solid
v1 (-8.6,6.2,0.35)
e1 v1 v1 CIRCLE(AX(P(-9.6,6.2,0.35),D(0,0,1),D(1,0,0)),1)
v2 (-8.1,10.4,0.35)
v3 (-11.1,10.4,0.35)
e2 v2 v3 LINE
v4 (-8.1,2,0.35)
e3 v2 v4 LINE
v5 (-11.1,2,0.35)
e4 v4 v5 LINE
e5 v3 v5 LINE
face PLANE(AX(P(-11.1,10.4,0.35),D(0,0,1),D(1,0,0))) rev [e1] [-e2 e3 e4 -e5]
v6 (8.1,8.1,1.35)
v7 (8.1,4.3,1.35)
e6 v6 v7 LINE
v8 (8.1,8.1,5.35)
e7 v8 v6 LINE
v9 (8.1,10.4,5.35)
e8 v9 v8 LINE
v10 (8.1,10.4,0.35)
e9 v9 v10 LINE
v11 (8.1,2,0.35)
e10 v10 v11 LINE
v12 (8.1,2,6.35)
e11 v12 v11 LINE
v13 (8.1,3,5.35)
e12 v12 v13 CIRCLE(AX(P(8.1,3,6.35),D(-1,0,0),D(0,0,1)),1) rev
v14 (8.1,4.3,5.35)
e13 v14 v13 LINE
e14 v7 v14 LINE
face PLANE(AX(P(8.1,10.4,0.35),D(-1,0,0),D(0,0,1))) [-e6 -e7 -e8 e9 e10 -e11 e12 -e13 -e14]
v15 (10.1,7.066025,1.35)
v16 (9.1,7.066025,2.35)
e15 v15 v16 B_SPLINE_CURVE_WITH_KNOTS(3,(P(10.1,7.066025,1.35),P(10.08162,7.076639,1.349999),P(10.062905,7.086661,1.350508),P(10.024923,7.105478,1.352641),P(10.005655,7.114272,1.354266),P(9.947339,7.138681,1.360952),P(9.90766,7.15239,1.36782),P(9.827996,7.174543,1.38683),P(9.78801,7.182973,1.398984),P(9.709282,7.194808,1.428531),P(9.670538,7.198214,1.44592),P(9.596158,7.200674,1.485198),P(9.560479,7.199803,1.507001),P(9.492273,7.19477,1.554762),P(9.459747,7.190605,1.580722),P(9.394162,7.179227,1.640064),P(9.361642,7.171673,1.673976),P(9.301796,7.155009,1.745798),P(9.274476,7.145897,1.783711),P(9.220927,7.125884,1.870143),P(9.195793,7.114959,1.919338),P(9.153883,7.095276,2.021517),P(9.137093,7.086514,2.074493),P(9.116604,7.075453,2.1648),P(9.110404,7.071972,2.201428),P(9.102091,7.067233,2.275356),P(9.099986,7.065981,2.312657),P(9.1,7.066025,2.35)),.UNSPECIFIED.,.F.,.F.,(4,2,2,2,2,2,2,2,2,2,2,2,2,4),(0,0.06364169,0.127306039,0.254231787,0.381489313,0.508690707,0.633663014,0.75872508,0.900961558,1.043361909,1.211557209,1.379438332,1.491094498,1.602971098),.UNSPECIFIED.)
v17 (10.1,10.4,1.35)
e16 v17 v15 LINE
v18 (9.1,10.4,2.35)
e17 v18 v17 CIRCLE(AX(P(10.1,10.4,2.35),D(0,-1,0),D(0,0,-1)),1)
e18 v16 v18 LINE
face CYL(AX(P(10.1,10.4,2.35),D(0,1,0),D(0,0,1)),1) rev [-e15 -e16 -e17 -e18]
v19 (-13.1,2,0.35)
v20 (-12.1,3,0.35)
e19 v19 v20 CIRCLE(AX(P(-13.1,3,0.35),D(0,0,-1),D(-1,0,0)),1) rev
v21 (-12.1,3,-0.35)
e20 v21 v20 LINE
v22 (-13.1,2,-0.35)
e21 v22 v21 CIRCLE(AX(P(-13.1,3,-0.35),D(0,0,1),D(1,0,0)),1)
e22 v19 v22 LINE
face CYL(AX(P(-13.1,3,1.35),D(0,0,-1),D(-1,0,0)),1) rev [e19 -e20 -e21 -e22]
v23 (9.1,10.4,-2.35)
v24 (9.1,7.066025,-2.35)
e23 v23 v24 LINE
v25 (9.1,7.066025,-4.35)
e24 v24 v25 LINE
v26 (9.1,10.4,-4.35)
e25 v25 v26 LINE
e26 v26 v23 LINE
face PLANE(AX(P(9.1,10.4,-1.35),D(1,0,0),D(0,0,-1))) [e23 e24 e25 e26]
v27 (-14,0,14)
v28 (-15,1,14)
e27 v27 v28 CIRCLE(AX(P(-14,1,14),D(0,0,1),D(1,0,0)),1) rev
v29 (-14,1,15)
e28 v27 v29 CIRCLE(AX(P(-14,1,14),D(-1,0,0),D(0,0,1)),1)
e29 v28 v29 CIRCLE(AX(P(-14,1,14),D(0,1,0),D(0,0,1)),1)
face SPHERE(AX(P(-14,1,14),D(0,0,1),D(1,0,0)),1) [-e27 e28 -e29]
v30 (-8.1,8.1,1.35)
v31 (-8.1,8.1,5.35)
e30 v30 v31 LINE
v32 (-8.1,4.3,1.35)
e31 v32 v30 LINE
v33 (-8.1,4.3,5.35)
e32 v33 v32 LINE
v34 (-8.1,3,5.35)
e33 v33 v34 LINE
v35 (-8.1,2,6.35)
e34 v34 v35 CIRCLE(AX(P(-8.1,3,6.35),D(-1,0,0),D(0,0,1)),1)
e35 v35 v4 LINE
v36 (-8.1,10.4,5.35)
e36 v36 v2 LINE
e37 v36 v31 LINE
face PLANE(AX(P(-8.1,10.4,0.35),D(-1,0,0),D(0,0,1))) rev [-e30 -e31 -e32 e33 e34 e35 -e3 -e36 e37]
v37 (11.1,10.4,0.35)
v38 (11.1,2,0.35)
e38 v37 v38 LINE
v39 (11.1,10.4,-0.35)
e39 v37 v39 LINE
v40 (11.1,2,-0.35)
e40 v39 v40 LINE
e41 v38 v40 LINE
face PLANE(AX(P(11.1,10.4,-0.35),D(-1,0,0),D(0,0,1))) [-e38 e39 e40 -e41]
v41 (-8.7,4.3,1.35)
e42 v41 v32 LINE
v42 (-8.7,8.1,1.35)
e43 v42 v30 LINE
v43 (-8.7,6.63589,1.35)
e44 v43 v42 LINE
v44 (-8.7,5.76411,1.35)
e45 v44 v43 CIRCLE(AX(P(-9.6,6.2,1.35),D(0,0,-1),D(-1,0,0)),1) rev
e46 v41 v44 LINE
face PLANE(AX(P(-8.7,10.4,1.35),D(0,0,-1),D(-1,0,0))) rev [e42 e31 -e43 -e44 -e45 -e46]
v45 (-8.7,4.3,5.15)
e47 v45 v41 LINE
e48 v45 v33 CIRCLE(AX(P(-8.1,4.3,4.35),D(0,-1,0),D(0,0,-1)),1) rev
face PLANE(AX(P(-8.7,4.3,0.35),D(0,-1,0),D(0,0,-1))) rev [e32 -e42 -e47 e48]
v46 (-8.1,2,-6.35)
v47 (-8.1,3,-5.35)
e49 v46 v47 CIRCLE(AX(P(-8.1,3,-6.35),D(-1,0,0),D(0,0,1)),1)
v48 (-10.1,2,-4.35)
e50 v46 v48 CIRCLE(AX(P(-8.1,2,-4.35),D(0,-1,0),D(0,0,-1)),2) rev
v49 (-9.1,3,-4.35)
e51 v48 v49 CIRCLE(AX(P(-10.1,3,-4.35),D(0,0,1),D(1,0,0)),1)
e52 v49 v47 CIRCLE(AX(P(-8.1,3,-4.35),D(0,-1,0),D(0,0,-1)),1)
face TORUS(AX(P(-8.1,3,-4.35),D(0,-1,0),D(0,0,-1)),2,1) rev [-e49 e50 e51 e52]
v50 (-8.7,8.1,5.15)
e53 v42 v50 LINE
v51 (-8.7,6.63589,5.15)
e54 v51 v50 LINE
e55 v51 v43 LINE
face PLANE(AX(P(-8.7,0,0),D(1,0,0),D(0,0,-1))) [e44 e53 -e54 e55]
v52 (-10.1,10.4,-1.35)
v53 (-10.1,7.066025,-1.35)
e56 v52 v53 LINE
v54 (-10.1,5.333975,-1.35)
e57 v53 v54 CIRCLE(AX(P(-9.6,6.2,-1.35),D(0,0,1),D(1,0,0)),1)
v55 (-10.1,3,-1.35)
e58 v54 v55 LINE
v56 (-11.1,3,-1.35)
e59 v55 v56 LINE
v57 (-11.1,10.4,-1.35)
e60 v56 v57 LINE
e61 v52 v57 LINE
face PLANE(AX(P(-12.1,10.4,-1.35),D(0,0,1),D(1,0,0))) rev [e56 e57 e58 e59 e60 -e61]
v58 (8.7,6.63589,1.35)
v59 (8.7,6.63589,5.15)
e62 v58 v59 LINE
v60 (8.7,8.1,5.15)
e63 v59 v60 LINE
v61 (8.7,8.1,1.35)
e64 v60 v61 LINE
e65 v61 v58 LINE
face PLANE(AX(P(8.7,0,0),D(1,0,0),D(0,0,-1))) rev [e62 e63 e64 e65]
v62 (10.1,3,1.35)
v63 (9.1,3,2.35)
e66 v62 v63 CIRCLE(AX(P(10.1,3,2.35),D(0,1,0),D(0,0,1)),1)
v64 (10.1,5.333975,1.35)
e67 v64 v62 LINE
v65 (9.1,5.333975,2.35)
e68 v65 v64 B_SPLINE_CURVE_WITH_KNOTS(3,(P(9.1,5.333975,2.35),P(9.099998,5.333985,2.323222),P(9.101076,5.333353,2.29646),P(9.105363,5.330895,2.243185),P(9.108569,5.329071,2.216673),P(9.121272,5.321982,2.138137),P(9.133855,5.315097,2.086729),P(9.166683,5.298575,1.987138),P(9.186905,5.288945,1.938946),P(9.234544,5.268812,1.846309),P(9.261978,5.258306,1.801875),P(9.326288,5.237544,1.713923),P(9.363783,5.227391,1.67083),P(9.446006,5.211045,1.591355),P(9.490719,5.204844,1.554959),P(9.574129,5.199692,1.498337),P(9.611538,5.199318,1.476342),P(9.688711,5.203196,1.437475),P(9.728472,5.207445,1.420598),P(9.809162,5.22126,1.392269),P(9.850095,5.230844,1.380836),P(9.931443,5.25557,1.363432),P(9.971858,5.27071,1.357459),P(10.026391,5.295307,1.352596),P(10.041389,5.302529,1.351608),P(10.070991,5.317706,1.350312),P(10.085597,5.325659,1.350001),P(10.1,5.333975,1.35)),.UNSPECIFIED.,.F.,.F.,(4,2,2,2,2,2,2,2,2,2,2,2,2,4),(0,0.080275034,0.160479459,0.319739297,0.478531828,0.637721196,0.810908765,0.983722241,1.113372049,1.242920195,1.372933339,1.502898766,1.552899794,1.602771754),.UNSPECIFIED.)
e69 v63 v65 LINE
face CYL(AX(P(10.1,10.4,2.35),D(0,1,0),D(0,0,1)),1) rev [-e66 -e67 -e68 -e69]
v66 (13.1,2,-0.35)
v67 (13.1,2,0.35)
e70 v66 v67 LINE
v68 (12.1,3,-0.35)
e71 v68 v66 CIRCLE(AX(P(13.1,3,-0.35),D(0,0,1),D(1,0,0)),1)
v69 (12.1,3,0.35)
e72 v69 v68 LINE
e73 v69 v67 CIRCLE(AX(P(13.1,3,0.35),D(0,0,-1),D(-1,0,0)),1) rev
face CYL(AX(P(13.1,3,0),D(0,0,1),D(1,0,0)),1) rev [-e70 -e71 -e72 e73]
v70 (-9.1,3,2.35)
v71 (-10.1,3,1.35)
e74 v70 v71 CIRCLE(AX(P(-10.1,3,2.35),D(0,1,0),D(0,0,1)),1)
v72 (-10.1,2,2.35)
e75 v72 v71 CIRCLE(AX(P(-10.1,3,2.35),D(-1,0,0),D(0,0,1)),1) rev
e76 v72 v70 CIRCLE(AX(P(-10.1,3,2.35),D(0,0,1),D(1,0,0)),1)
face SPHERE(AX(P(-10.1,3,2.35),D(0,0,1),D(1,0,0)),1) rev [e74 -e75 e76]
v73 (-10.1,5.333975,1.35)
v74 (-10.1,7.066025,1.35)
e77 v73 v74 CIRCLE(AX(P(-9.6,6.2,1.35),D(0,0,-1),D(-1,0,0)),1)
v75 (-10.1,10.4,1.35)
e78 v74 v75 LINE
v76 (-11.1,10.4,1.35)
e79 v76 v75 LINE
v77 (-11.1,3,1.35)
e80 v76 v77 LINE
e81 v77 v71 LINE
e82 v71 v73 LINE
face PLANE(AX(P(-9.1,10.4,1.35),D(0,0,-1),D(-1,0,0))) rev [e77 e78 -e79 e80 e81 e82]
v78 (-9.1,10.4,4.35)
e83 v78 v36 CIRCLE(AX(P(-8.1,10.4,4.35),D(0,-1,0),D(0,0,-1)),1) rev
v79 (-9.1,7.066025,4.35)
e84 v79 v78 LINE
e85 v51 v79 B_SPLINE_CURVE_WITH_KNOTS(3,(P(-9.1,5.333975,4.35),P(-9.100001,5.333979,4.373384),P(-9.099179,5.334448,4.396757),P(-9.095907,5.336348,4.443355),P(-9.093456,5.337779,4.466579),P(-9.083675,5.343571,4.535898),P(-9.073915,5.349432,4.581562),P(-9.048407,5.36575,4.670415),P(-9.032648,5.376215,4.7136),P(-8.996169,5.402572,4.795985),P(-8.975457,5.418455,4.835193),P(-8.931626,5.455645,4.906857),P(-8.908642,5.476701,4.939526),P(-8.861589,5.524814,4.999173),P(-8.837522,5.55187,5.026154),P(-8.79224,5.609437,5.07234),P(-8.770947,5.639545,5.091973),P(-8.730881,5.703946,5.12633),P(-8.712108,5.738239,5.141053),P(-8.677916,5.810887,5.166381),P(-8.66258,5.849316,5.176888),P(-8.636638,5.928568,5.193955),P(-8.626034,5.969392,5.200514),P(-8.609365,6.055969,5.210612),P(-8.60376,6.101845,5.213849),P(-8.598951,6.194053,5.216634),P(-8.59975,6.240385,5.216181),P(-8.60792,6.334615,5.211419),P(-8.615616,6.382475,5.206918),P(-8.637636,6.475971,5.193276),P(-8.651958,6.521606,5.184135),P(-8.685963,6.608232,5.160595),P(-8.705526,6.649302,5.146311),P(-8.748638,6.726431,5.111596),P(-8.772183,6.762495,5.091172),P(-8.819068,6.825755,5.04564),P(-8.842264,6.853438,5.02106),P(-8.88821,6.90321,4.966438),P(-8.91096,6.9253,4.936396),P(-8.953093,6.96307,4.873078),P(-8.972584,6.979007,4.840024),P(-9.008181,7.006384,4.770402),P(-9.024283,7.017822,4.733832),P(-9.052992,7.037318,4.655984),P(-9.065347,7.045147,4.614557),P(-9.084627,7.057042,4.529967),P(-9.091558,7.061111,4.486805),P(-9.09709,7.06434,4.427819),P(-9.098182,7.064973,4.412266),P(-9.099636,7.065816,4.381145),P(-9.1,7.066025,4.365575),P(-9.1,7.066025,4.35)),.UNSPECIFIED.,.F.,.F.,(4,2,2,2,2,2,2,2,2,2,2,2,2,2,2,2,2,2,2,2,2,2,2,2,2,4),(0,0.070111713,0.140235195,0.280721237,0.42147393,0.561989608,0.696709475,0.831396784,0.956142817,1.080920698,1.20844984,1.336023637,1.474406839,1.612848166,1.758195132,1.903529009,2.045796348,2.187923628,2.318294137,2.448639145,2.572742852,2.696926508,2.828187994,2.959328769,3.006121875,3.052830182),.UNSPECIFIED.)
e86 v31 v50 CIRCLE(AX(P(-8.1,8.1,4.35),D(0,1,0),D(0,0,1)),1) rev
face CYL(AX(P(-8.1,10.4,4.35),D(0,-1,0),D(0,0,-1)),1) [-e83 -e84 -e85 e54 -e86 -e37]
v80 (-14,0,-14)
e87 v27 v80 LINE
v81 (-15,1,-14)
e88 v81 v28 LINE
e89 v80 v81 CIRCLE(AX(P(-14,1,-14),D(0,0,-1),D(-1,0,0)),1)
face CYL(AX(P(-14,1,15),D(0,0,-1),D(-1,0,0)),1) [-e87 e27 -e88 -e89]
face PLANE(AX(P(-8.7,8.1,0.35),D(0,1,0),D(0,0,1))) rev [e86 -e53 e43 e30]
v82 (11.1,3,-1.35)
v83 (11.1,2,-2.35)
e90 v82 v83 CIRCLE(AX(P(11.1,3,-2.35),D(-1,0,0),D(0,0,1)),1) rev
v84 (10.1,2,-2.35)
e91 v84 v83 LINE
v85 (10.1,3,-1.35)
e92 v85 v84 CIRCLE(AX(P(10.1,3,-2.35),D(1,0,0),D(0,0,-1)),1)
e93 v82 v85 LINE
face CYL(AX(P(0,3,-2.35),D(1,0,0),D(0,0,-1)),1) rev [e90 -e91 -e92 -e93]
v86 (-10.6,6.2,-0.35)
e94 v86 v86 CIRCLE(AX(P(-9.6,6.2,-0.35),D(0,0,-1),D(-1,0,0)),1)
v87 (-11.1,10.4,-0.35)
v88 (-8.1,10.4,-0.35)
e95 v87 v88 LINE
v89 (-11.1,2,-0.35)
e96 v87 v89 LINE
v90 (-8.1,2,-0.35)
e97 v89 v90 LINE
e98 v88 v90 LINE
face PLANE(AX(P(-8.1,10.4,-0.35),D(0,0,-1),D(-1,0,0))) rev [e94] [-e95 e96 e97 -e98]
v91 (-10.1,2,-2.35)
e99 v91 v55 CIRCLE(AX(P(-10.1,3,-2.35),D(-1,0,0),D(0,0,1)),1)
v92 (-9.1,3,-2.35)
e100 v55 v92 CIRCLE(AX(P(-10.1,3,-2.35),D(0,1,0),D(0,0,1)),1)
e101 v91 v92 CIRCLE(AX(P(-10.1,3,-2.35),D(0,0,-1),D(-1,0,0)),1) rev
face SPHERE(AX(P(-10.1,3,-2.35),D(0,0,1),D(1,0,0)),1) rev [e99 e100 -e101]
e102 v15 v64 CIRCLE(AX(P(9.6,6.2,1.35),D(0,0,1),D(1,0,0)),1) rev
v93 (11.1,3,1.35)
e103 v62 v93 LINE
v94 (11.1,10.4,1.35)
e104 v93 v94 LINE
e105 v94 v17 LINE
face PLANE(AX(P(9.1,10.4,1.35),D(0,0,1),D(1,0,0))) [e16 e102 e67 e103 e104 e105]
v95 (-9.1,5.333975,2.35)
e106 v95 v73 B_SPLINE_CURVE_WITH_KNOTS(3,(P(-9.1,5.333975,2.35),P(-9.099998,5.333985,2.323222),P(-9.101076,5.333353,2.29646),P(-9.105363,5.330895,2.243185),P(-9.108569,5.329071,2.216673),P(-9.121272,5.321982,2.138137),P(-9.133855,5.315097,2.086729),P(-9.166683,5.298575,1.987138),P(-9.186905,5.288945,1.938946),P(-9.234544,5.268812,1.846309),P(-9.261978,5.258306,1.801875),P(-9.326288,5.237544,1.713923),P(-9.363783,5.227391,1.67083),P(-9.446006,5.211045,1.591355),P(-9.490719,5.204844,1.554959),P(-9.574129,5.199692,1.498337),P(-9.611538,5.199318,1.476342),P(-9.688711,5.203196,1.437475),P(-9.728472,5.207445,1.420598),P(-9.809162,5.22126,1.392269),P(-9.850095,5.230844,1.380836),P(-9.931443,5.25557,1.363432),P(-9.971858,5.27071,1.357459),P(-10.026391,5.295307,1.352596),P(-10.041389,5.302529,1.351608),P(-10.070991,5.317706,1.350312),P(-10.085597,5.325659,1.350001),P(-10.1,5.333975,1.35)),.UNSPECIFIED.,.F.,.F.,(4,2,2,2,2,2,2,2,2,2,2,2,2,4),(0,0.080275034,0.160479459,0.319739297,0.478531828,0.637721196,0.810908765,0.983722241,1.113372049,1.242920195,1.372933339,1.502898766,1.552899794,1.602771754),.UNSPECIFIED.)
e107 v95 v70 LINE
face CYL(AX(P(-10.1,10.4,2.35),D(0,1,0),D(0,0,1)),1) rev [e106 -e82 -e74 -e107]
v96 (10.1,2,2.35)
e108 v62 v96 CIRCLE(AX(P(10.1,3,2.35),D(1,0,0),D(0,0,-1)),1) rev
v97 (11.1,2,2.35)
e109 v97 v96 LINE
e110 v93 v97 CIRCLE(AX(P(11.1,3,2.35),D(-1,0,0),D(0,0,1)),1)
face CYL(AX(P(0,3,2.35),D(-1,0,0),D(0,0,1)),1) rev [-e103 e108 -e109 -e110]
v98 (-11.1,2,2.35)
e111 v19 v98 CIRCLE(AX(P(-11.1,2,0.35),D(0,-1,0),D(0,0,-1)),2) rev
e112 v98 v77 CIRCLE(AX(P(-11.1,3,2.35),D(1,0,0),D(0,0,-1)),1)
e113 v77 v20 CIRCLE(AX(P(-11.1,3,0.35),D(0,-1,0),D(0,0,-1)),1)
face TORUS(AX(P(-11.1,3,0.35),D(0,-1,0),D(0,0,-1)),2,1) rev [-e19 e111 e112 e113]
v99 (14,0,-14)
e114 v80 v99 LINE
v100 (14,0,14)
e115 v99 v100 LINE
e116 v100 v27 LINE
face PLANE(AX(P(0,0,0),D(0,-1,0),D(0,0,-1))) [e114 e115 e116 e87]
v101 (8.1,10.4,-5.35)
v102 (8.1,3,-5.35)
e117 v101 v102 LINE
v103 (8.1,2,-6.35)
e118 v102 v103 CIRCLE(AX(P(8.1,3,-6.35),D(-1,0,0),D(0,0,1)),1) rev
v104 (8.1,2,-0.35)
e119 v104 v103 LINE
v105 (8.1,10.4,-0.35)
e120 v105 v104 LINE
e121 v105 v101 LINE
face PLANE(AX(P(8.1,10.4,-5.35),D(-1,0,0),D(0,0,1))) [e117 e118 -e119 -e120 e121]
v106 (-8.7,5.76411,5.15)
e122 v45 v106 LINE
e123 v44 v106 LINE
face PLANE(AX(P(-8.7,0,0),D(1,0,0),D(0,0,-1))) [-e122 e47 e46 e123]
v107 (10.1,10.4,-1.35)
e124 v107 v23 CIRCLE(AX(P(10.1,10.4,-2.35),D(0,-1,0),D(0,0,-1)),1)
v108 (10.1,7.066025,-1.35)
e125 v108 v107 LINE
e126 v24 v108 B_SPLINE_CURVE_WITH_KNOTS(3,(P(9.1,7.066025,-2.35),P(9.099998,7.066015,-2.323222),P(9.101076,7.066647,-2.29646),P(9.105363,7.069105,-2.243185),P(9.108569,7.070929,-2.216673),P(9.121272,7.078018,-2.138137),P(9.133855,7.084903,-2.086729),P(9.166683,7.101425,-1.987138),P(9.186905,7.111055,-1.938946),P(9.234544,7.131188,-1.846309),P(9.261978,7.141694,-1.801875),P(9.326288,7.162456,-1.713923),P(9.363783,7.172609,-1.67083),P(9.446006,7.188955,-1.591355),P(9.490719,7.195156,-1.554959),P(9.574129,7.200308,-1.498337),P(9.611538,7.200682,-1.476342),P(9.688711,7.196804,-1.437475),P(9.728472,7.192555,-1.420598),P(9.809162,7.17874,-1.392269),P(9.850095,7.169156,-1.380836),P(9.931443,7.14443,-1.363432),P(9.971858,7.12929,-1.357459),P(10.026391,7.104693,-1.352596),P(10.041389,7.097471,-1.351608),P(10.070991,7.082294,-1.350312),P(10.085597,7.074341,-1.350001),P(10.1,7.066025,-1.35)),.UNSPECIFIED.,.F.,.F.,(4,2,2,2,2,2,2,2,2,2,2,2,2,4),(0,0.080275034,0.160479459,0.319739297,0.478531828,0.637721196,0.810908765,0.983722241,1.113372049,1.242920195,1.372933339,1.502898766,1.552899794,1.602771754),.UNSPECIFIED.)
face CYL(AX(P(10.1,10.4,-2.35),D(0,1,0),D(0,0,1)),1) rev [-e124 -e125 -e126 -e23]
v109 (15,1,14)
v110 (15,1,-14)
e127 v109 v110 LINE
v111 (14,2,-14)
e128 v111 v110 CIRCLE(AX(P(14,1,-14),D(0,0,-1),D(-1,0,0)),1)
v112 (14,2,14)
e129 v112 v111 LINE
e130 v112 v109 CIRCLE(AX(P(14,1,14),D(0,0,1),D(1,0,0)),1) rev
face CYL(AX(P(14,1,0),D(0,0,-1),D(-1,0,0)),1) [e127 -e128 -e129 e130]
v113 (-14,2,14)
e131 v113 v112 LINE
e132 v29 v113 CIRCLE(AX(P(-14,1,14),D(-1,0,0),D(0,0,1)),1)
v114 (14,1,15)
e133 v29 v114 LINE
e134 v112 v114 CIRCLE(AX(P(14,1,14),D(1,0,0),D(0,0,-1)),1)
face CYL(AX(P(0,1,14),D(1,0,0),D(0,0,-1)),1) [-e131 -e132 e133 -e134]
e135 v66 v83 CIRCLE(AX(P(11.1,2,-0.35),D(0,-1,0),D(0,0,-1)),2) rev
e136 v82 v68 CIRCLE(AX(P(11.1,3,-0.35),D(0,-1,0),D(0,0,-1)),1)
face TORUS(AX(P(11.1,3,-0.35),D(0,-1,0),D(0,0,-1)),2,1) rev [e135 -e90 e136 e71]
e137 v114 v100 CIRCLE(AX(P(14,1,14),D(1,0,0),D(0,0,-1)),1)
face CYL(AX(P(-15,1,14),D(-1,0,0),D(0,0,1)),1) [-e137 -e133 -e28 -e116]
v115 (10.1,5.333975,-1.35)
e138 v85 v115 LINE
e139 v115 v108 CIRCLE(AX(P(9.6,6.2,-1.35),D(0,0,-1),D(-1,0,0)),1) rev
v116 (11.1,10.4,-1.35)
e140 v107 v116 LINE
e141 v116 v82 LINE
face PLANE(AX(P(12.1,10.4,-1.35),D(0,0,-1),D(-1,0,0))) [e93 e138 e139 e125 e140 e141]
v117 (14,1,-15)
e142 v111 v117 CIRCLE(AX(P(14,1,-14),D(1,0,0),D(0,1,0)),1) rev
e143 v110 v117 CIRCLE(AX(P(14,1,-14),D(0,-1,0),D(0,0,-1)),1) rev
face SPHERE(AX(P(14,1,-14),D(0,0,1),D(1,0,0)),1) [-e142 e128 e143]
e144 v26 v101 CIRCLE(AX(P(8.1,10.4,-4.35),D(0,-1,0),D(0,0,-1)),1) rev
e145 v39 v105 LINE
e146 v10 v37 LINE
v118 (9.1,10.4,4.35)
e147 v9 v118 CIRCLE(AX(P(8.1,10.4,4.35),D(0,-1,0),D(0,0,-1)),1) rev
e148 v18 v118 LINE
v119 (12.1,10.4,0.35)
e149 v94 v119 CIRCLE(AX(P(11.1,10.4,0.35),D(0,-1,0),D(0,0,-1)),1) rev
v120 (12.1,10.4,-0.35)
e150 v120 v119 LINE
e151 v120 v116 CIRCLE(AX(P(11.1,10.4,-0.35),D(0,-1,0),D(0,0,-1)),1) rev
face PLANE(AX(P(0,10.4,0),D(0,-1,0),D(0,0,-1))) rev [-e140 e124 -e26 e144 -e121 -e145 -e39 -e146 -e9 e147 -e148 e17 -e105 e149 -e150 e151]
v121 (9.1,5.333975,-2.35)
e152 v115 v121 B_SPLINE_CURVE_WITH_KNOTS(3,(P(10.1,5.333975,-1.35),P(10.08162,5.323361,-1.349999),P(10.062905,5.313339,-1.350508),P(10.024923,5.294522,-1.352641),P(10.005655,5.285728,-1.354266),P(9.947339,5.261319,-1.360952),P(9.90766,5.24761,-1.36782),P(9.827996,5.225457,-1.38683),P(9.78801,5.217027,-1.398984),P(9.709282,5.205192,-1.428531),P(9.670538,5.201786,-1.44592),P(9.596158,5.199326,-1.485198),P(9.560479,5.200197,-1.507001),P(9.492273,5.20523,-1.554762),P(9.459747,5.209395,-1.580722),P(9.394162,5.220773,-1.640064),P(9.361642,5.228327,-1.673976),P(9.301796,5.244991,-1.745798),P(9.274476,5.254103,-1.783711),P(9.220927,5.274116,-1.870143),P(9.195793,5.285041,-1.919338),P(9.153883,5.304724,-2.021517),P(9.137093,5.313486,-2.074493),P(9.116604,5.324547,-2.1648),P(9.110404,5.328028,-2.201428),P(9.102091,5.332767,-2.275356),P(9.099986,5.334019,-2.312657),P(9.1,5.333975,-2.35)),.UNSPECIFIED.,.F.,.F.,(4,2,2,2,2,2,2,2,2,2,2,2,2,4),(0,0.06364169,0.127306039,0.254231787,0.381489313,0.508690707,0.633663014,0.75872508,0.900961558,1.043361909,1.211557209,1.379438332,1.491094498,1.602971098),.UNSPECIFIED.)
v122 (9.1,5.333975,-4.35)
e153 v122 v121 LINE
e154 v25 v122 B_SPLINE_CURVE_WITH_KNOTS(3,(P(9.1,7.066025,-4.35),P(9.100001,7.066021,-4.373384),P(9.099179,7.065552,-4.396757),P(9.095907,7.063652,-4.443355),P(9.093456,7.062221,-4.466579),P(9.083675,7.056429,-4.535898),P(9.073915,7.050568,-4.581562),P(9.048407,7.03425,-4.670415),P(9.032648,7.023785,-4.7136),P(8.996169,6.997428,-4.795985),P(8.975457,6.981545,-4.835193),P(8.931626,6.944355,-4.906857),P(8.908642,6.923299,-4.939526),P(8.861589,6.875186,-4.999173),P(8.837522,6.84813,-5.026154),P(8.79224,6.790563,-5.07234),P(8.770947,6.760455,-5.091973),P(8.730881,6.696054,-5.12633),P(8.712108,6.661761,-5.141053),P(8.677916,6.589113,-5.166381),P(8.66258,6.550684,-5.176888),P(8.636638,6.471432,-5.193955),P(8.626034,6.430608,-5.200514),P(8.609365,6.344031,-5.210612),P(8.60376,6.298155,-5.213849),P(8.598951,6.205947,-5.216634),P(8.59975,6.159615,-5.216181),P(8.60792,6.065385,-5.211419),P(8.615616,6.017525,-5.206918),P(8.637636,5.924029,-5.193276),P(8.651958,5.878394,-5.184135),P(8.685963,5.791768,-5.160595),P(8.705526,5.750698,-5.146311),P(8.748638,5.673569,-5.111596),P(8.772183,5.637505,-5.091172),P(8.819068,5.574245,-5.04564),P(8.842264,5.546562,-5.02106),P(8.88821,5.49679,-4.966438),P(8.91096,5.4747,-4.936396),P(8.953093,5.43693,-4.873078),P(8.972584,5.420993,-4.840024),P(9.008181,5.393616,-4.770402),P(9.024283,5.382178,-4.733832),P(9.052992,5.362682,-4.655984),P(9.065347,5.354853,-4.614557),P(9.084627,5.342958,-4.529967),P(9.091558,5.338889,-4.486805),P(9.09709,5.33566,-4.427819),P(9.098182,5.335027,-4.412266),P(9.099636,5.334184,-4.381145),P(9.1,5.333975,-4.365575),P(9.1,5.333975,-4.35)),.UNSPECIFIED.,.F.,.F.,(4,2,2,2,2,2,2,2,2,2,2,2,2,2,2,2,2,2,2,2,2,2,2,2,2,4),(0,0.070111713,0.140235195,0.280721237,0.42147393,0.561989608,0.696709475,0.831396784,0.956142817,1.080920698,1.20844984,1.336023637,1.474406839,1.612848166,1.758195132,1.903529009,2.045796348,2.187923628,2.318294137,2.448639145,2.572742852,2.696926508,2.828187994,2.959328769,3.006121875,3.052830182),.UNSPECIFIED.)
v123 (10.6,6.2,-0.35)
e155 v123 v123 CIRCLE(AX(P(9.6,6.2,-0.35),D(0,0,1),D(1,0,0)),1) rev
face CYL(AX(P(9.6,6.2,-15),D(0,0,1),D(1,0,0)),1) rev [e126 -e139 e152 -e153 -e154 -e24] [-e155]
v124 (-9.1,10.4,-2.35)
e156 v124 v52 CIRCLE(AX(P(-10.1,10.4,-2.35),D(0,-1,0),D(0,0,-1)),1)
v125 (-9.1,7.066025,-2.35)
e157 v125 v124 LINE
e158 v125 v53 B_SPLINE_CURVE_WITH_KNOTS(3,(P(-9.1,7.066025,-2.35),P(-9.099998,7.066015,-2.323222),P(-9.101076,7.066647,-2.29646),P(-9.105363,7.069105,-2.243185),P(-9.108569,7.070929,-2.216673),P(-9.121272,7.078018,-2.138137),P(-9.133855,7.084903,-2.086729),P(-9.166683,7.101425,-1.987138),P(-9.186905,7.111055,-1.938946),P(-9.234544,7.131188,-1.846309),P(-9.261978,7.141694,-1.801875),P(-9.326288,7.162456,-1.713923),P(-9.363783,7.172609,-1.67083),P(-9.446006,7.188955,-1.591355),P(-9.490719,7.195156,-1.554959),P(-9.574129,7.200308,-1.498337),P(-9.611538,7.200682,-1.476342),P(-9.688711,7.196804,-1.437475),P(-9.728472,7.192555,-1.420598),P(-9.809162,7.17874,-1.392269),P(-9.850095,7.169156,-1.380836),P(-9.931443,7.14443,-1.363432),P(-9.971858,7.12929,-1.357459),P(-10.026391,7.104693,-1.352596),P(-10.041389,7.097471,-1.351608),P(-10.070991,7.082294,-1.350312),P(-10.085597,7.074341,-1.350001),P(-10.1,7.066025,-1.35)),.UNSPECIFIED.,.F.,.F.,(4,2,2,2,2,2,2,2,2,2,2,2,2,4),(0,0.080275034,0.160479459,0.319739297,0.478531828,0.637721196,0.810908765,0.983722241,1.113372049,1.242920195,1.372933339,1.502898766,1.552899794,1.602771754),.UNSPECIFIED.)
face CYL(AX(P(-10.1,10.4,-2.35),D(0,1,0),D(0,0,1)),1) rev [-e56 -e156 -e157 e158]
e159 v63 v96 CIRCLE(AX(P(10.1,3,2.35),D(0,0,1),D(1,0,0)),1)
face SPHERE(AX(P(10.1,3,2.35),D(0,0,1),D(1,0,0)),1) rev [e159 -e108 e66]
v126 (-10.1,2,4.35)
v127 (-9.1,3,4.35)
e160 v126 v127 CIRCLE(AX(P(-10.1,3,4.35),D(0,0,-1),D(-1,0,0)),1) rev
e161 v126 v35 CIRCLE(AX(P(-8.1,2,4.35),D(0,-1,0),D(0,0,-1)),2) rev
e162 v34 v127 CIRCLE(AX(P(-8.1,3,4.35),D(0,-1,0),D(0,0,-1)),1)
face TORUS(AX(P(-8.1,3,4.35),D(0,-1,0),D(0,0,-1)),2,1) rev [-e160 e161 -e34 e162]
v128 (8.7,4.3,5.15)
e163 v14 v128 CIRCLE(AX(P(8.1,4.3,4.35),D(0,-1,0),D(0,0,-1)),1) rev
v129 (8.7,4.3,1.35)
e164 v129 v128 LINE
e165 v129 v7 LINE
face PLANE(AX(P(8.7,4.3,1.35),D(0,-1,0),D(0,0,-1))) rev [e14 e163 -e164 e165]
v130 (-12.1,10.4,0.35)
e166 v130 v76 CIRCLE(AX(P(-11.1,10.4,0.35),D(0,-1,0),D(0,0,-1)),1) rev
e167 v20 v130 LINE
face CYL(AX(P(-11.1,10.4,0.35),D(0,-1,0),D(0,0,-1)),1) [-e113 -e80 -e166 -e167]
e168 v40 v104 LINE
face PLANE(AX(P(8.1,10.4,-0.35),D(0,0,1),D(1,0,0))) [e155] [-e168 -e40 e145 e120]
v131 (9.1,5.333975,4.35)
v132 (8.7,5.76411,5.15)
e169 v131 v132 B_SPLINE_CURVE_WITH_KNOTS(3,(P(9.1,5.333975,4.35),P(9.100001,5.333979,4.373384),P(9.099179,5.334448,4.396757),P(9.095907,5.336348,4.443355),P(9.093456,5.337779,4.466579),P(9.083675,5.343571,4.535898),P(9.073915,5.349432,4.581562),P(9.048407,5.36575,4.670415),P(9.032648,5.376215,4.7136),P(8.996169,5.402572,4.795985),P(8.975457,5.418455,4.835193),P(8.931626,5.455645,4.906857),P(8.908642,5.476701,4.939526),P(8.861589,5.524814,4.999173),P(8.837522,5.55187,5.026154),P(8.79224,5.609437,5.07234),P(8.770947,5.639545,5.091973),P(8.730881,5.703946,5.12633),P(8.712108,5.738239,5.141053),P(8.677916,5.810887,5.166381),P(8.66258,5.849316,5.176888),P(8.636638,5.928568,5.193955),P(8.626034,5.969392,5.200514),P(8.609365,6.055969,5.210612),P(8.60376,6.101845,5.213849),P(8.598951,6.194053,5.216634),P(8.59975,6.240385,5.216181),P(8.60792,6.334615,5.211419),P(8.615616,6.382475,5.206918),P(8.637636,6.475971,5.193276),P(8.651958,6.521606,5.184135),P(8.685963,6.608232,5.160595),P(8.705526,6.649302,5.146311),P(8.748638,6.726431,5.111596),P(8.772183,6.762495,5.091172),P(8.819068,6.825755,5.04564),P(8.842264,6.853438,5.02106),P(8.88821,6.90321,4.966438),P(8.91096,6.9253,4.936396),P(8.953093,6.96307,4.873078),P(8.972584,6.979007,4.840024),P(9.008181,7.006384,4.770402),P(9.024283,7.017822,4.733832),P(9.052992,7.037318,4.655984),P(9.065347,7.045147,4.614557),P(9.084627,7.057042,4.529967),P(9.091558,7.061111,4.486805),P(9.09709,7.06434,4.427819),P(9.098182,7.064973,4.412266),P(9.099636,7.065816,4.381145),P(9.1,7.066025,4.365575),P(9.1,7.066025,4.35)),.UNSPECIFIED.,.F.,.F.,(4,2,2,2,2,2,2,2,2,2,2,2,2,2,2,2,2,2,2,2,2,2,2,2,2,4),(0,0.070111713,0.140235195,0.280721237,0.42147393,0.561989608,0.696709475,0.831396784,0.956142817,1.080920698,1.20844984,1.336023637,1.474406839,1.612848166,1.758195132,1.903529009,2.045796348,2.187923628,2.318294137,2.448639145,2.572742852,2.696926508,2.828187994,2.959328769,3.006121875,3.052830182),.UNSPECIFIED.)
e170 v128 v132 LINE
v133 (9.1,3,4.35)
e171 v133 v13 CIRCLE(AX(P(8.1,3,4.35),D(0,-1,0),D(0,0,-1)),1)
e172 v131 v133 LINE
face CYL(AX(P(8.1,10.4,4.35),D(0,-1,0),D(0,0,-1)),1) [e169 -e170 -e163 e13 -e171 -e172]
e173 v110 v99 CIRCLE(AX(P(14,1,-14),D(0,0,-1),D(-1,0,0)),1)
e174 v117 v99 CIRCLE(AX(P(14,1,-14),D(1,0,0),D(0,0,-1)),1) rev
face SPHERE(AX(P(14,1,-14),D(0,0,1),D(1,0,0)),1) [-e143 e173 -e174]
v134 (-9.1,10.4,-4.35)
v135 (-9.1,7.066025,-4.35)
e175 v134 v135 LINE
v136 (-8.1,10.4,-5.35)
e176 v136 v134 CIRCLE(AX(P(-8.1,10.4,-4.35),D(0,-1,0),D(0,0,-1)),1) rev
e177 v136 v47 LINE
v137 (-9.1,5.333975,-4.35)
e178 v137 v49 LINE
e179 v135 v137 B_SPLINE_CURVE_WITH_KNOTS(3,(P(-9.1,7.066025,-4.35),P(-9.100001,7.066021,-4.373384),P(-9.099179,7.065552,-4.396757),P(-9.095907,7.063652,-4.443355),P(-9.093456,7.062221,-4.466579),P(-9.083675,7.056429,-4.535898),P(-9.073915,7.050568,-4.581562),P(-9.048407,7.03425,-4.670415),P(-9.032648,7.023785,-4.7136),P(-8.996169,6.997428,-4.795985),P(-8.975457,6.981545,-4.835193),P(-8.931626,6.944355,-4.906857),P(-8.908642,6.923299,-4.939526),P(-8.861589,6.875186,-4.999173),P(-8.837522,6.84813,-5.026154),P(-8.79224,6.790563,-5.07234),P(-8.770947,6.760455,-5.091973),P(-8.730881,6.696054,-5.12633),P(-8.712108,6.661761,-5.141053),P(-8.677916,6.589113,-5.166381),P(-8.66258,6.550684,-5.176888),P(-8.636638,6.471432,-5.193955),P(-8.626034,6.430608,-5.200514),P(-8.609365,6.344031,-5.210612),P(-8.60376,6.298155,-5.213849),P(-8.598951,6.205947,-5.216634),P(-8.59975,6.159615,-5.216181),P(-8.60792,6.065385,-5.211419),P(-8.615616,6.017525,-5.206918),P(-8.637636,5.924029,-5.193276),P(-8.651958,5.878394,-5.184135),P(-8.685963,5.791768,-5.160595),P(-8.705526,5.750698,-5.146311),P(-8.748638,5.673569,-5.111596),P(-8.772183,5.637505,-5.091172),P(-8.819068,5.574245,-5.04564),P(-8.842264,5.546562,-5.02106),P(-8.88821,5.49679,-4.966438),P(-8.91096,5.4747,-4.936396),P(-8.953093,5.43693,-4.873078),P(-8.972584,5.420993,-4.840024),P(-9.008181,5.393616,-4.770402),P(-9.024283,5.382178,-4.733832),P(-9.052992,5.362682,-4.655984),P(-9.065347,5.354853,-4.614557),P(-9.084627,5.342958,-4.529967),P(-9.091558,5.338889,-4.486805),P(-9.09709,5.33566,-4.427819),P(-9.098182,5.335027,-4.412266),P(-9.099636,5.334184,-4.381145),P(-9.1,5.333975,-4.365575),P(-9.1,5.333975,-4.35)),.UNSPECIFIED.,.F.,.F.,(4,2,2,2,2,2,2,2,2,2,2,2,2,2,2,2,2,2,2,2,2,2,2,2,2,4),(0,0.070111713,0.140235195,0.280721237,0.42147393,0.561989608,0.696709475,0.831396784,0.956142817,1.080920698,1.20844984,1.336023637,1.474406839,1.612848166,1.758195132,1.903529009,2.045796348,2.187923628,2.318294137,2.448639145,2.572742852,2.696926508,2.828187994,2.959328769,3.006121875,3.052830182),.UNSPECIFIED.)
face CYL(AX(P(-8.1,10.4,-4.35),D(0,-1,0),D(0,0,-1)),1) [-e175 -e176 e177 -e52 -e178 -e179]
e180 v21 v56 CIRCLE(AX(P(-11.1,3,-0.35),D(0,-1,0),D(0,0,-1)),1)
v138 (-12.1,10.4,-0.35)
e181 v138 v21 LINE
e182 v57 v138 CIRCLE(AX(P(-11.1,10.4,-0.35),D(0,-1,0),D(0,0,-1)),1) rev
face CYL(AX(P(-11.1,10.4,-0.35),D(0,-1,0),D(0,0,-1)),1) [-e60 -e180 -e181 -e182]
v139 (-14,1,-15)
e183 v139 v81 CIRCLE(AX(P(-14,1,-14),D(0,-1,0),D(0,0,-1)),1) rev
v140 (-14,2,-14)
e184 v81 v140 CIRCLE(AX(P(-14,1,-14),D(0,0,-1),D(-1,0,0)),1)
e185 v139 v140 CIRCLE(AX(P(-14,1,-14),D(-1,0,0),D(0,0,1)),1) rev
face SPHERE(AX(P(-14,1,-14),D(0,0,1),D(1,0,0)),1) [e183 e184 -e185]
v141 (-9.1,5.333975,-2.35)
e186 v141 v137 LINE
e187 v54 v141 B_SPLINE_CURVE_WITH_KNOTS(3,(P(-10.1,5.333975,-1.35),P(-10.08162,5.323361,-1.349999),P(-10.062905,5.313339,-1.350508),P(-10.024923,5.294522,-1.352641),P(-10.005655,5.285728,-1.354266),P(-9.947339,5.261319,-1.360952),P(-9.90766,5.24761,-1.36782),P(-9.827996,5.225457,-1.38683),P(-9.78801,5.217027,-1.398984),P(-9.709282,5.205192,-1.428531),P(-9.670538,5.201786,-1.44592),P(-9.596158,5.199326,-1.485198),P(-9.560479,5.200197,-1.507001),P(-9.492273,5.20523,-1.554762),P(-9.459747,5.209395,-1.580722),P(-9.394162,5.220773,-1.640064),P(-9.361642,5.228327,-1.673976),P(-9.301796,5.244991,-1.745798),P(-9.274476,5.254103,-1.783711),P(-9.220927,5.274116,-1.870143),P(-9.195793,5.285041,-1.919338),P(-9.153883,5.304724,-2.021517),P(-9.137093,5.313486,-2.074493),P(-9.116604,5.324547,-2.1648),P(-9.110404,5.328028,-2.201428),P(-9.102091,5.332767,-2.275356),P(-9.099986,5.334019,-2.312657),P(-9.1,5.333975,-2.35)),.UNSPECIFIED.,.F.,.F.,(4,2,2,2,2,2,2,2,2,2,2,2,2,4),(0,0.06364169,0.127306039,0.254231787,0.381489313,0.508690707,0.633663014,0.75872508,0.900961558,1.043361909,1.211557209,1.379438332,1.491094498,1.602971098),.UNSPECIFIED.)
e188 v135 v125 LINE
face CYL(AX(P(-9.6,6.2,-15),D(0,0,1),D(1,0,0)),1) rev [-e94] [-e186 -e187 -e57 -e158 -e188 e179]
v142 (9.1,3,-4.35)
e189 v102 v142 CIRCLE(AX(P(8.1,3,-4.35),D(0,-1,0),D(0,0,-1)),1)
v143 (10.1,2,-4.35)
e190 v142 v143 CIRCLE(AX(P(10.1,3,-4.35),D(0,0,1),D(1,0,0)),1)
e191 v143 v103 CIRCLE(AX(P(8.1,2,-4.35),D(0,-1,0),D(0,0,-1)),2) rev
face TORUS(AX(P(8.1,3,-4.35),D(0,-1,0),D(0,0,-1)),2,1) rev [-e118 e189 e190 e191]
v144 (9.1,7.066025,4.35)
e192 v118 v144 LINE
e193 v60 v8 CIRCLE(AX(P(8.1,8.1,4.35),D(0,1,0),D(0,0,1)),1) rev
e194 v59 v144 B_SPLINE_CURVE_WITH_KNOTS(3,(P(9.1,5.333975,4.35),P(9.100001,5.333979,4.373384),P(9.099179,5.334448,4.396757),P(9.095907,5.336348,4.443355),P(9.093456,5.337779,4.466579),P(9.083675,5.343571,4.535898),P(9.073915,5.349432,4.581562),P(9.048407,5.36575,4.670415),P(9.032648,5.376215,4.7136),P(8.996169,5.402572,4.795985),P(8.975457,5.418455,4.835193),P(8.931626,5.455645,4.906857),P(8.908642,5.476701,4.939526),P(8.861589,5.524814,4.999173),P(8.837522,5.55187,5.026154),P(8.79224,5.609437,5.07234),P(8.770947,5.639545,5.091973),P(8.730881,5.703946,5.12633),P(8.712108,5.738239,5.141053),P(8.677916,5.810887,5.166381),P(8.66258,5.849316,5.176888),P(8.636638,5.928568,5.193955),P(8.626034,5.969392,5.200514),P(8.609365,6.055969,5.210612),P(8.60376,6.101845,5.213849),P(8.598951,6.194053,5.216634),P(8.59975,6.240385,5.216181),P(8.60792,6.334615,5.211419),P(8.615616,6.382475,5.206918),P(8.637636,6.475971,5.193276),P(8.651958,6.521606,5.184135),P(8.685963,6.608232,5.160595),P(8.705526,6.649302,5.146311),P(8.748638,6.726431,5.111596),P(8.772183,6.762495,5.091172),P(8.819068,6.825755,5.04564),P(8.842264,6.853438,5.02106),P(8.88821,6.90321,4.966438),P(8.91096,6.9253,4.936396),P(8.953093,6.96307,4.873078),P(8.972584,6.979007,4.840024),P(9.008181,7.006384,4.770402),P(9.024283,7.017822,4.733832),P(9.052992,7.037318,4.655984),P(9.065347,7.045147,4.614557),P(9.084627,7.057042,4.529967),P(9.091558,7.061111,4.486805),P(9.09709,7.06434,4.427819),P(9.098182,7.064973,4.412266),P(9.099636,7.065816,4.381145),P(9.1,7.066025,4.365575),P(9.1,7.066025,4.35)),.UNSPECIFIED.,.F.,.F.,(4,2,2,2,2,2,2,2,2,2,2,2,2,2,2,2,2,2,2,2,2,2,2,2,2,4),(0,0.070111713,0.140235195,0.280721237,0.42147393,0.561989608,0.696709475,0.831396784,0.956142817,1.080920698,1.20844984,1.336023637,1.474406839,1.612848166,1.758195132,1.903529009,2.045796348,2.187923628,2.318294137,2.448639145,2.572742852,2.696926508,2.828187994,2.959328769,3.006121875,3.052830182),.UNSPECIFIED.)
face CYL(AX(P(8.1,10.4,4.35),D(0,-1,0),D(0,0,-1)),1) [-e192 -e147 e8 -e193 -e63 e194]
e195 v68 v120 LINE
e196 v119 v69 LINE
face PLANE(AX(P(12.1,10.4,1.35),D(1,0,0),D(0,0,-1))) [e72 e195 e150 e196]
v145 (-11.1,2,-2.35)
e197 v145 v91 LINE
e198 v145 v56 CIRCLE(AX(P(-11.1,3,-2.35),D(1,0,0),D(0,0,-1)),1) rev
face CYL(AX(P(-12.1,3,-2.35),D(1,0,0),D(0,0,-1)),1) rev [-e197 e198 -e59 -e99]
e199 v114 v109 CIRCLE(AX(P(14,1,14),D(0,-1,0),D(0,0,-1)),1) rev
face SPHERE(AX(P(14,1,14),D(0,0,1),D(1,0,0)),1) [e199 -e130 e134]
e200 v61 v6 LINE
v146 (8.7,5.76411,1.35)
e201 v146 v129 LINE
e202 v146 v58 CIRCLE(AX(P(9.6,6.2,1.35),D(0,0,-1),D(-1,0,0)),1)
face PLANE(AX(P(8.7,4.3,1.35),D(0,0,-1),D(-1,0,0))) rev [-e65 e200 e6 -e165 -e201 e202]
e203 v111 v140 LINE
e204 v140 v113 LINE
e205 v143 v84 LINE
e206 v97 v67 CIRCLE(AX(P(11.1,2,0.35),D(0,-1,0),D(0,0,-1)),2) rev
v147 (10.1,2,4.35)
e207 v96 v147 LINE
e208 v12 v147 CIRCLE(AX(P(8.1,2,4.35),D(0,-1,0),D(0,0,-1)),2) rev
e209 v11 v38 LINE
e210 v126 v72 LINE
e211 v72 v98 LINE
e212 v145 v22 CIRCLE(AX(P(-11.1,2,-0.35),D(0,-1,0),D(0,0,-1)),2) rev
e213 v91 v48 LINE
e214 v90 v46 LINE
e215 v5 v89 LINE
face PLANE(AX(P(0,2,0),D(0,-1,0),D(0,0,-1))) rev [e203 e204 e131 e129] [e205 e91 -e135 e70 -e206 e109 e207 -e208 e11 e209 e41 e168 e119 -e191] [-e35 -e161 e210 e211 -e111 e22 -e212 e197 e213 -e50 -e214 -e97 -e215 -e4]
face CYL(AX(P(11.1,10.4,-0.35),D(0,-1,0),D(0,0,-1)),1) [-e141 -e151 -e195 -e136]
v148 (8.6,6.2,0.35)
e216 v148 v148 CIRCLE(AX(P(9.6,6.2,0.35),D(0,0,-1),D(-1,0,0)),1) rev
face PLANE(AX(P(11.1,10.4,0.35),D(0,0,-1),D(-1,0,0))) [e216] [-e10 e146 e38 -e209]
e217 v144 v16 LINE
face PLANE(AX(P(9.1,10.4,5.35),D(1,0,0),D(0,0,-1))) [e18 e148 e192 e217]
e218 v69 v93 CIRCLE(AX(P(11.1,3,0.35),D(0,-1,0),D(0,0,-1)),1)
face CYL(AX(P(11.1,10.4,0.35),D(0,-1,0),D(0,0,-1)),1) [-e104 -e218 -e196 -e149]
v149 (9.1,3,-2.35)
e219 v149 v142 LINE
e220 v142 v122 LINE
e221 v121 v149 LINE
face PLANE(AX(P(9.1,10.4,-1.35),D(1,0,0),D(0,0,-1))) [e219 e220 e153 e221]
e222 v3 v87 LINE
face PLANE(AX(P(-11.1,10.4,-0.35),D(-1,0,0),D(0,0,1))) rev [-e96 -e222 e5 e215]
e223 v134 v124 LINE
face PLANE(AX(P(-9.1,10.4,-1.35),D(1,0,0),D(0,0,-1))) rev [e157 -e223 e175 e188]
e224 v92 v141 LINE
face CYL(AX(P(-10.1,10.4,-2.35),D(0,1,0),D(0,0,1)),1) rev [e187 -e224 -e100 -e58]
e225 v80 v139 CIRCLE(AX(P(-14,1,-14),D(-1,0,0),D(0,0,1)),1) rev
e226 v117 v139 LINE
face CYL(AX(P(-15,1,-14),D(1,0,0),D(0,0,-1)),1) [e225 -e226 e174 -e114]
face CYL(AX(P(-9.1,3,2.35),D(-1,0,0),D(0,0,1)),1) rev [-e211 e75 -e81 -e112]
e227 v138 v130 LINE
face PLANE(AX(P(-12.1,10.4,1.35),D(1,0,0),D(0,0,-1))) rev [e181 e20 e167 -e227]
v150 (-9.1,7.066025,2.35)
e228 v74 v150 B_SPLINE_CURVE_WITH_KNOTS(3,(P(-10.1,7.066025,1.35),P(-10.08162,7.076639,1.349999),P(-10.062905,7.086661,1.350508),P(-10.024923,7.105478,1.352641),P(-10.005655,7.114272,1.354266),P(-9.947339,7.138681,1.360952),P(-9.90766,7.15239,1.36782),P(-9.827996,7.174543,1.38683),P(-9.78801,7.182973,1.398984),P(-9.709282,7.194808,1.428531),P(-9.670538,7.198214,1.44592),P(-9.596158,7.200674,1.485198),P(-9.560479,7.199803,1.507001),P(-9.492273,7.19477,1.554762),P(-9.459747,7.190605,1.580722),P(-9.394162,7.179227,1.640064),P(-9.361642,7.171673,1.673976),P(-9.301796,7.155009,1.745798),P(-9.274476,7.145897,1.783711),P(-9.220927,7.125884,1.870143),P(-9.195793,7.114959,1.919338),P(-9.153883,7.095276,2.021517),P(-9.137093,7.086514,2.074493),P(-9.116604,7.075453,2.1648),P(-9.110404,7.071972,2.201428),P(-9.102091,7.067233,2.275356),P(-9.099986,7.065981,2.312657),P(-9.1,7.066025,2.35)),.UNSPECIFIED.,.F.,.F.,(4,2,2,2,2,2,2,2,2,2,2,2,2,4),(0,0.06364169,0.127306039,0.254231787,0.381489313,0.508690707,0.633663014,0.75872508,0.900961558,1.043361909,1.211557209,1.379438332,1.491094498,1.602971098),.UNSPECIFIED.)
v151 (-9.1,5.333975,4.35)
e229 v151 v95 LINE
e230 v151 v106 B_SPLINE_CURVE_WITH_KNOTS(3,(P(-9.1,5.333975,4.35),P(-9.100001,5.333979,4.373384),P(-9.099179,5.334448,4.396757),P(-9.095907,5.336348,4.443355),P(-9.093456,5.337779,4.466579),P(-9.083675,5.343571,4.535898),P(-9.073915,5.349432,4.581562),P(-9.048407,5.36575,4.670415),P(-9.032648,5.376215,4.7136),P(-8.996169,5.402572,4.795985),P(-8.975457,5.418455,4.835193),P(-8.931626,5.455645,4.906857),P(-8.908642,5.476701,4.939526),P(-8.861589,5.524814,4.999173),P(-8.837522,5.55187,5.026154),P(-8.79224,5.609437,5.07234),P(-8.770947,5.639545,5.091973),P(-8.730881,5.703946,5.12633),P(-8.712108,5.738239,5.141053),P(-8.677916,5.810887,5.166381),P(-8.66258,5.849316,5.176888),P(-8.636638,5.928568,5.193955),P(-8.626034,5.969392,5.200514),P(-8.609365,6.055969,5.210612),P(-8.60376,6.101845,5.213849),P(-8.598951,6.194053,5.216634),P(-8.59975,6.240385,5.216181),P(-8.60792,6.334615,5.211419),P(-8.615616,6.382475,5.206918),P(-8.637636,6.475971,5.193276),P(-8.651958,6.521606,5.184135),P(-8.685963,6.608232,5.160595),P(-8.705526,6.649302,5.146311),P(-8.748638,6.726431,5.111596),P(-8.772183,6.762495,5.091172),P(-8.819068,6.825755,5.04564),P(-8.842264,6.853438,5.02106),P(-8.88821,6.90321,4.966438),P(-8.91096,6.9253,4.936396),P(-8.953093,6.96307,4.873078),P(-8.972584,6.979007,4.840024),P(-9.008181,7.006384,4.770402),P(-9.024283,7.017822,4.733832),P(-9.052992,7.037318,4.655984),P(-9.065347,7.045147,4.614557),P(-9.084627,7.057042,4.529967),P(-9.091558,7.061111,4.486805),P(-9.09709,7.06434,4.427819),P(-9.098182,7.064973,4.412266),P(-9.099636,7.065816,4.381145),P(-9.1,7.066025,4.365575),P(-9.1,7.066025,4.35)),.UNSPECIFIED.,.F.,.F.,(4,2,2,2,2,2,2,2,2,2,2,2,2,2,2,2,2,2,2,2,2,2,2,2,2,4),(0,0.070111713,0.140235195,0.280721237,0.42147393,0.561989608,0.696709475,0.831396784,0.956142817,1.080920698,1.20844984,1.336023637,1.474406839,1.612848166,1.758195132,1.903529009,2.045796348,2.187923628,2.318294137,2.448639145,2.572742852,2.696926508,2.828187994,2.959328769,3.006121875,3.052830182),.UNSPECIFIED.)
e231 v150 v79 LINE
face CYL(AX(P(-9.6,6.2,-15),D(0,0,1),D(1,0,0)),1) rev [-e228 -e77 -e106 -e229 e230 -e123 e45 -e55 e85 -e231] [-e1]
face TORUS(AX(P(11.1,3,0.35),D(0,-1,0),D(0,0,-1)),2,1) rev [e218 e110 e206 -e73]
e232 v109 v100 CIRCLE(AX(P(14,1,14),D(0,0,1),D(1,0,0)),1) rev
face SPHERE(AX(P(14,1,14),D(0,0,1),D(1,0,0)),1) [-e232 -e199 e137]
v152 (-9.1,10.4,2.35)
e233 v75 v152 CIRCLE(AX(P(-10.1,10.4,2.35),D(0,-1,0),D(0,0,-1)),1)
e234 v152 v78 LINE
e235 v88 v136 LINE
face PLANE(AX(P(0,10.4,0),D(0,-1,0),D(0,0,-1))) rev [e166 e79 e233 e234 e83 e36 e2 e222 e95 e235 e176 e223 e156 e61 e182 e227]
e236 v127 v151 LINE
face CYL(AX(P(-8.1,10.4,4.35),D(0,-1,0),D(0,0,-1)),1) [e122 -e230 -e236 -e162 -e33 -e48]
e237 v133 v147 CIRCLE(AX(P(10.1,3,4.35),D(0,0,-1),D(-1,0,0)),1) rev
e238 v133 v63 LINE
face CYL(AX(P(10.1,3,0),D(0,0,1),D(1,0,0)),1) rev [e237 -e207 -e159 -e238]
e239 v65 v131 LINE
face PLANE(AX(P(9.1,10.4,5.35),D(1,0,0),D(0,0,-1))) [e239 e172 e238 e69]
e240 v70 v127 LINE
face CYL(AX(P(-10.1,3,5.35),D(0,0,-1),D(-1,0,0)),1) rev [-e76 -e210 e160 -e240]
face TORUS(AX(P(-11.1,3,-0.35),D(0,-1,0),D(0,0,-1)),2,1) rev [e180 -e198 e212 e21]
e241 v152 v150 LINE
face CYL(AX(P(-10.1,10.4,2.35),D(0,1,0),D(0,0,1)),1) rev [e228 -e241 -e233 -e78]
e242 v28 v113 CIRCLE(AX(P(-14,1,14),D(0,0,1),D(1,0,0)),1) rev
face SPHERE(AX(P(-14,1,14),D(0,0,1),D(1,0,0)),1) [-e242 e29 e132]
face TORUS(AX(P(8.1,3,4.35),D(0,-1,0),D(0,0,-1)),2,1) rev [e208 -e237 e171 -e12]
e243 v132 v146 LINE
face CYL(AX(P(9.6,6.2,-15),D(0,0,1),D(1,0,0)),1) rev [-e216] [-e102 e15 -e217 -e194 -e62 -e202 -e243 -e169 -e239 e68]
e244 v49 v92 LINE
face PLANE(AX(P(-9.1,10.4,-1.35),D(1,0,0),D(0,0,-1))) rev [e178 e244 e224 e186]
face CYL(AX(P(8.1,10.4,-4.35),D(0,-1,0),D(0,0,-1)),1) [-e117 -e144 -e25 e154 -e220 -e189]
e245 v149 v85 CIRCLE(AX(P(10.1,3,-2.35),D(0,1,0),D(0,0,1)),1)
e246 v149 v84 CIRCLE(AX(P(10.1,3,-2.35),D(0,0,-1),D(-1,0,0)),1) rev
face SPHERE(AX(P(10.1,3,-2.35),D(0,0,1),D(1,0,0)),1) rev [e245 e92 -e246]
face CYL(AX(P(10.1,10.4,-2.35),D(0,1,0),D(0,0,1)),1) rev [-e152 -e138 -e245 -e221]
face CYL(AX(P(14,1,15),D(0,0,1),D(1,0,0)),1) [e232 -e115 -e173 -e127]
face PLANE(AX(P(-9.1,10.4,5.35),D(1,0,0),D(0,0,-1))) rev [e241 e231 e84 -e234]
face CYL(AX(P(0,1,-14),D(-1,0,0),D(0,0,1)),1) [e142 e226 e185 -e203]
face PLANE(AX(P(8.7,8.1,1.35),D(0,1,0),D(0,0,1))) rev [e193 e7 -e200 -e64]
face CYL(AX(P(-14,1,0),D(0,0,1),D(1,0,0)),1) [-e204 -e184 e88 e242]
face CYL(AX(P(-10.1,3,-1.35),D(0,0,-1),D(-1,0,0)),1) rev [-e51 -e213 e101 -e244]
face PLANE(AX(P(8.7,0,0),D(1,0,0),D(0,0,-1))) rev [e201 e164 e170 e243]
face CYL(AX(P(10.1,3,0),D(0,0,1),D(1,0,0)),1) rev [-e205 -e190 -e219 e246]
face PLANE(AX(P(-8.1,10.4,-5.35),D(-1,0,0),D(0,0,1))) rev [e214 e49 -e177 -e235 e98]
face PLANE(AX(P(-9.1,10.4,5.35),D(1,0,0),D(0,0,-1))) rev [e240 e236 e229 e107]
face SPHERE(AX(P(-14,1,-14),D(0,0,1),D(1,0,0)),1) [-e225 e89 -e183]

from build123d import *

# Parameters (mm, degrees)
SKETCH1_W              = 30
SKETCH1_H              = 30
BOSS_EXTRUDE1_DEPTH    = 2
BOSS_EXTRUDE2_DEPTH    = 8.4
FILLET1_R              = 1
CUT_EXTRUDE1_START     = -6.566028302
CUT_EXTRUDE1_OUTLINE_R = 1
CUT_EXTRUDE1_DEPTH     = 10.432056604
SKETCH6_W              = 4
SKETCH6_H              = 3.8
CUT_EXTRUDE2_DEPTH     = 0.6
CUT_EXTRUDE3_START     = 16.2
SKETCH6_2_W            = 4
SKETCH6_2_H            = 3.8
CUT_EXTRUDE3_DEPTH     = 0.6
FILLET2_R              = 1


# Read off the part's stored shape, not the designer's step: Cut-Extrude1, Mirror1
# Some blends are built 0.0001 mm under size
with BuildPart() as part:
    # Sketch1 → Boss-Extrude1 (new body)
    with BuildSketch(Plane(origin=(0, 0, 0), x_dir=(1, 0, 0), z_dir=(0, 1, 0))):
        Rectangle(SKETCH1_W, SKETCH1_H)
    extrude(amount=BOSS_EXTRUDE1_DEPTH)

    # Sketch2 → Boss-Extrude2 (add)
    with BuildSketch(Plane(origin=(0, 2, 0), x_dir=(1, 0, 0), z_dir=(0, 1, 0))):
        Polygon((-9.1, 5.35), (-8.1, 5.35), (-8.1, 0.35), (-11.1, 0.35), (-11.1, -0.35), (-8.1, -0.35), (-8.1, -5.35), (-9.1, -5.35), (-9.1, -1.35), (-12.1, -1.35), (-12.1, 1.35), (-9.1, 1.35), align=None)
    extrude(amount=BOSS_EXTRUDE2_DEPTH)

    # Fillet1
    # the kernel refuses this fillet: 1 mm, written as the material it adds along each edge
    with BuildSketch(Plane(origin=(-9.1, 2, -1.35), x_dir=(0, 0, -1), z_dir=(0, 1, 0)), Plane(origin=(-9.1, 2, 1.35), x_dir=(-1, 0, 0), z_dir=(0, 1, 0))) as fillet1_piece_1:
        with BuildLine():
            CenterArc((FILLET1_R, FILLET1_R), FILLET1_R, 180, 90)
            Line((0, FILLET1_R), (0, 0))
            Line((0, 0), (FILLET1_R, 0))
        make_face()
    extrude(amount=8.4)
    # the kernel refuses this fillet: 1 mm, written as the material it takes off along each edge
    with BuildSketch(Plane(origin=(-9.1, 2, -5.35), x_dir=(1, 0, 0), z_dir=(0, 1, 0)), Plane(origin=(-12.1, 2, -1.35), x_dir=(1, 0, 0), z_dir=(0, 1, 0)), Plane(origin=(-12.1, 2, 1.35), x_dir=(0, 0, -1), z_dir=(0, 1, 0)), Plane(origin=(-9.1, 2, 5.35), x_dir=(0, 0, -1), z_dir=(0, 1, 0))) as fillet1_2_piece_1:
        with BuildLine():
            CenterArc((FILLET1_R, -FILLET1_R), FILLET1_R, 90, 90)
            Line((0, -FILLET1_R), (0, 0))
            Line((0, 0), (FILLET1_R, 0))
        make_face()
    extrude(amount=10.9, mode=Mode.SUBTRACT)
    # the kernel refuses this fillet: 1 mm, written as the material it adds along each edge
    with BuildSketch(Plane(origin=(-9.1, 2, -2.35), x_dir=(-1, 0, 0), z_dir=(0, 0, -1)), Plane(origin=(-9.1, 2, 4.35), x_dir=(-1, 0, 0), z_dir=(0, 0, -1))) as fillet1_3_piece_1:
        with BuildLine():
            CenterArc((FILLET1_R, FILLET1_R), FILLET1_R, 180, 90)
            Line((0, FILLET1_R), (0, 0))
            Line((0, 0), (FILLET1_R, 0))
        make_face()
    extrude(amount=2)
    with BuildSketch(Plane(origin=(-11.1, 2, -1.35), x_dir=(0, 0, -1), z_dir=(1, 0, 0)), Plane(origin=(-10.1, 2, 1.35), x_dir=(0, 0, 1), z_dir=(-1, 0, 0))) as fillet1_3_piece_2:
        with BuildLine():
            CenterArc((FILLET1_R, FILLET1_R), FILLET1_R, 180, 90)
            Line((0, FILLET1_R), (0, 0))
            Line((0, 0), (FILLET1_R, 0))
        make_face()
    extrude(amount=1)
    with BuildSketch(Plane(origin=(-12.1, 2, 0.35), x_dir=(-1, 0, 0), z_dir=(0, 0, -1))) as fillet1_3_piece_3:
        with BuildLine():
            CenterArc((FILLET1_R, FILLET1_R), FILLET1_R, 180, 90)
            Line((0, FILLET1_R), (0, 0))
            Line((0, 0), (FILLET1_R, 0))
        make_face()
    extrude(amount=0.7)
    with BuildSketch(Plane(origin=(-8.1, 2, 4.35), x_dir=(-1, 0, 0), z_dir=(0, 0, -1))) as fillet1_3_piece_4:
        with BuildLine():
            CenterArc((1 + FILLET1_R, FILLET1_R), FILLET1_R, 180, 90)
            Line((1, FILLET1_R), (1, 0))
            Line((1, 0), (1 + FILLET1_R, 0))
        make_face()
    revolve(axis=Axis((-8.1, 2, 4.35), (0, 1, 0)), revolution_arc=90)
    with BuildSketch(Plane(origin=(-10.1, 2, 2.35), x_dir=(0, 0, -1), z_dir=(-1, 0, 0))) as fillet1_3_piece_5:
        with BuildLine():
            CenterArc((1 - FILLET1_R, -FILLET1_R), FILLET1_R, 0, 90)
            Line((1, -FILLET1_R), (1, 0))
            Line((1, 0), (1 - FILLET1_R, 0))
        make_face()
    revolve(axis=Axis((-10.1, 2, 2.35), (0, -1, 0)), revolution_arc=90)
    with BuildSketch(Plane(origin=(-11.1, 2, 0.35), x_dir=(-1, 0, 0), z_dir=(0, 0, -1))) as fillet1_3_piece_6:
        with BuildLine():
            CenterArc((1 + FILLET1_R, FILLET1_R), FILLET1_R, 180, 90)
            Line((1, FILLET1_R), (1, 0))
            Line((1, 0), (1 + FILLET1_R, 0))
        make_face()
    revolve(axis=Axis((-11.1, 2, 0.35), (0, 1, 0)), revolution_arc=90)
    with BuildSketch(Plane(origin=(-11.1, 2, -0.35), x_dir=(0, 0, -1), z_dir=(1, 0, 0))) as fillet1_3_piece_7:
        with BuildLine():
            CenterArc((1 + FILLET1_R, FILLET1_R), FILLET1_R, 180, 90)
            Line((1, FILLET1_R), (1, 0))
            Line((1, 0), (1 + FILLET1_R, 0))
        make_face()
    revolve(axis=Axis((-11.1, 2, -0.35), (0, 1, 0)), revolution_arc=90)
    with BuildSketch(Plane(origin=(-10.1, 2, -2.35), x_dir=(1, 0, 0), z_dir=(0, 0, -1))) as fillet1_3_piece_8:
        with BuildLine():
            CenterArc((1 - FILLET1_R, -FILLET1_R), FILLET1_R, 0, 90)
            Line((1, -FILLET1_R), (1, 0))
            Line((1, 0), (1 - FILLET1_R, 0))
        make_face()
    revolve(axis=Axis((-10.1, 2, -2.35), (0, -1, 0)), revolution_arc=90)
    with BuildSketch(Plane(origin=(-8.1, 2, -4.35), x_dir=(0, 0, -1), z_dir=(1, 0, 0))) as fillet1_3_piece_9:
        with BuildLine():
            CenterArc((1 + FILLET1_R, FILLET1_R), FILLET1_R, 180, 90)
            Line((1, FILLET1_R), (1, 0))
            Line((1, 0), (1 + FILLET1_R, 0))
        make_face()
    revolve(axis=Axis((-8.1, 2, -4.35), (0, 1, 0)), revolution_arc=90)

    # Cut-Extrude1 outline → Cut-Extrude1 (cut)
    with BuildSketch(Plane.XY.offset(1.35).offset(CUT_EXTRUDE1_START)):
        with Locations((-9.6, 6.2)):
            Circle(CUT_EXTRUDE1_OUTLINE_R)
    extrude(amount=CUT_EXTRUDE1_DEPTH, mode=Mode.SUBTRACT)

    # Mirror1: part across plane


with BuildPart() as part_1:
    add(part.part)
    add(part.part.mirror(Plane(origin=(0, 0, 0), x_dir=(0, 0, 1), z_dir=(1, 0, 0))))

    # Sketch6 → Cut-Extrude2 (cut)
    with BuildSketch(Plane.ZY.offset(-8.1)):
        with Locations((3.35, 6.2)):
            Rectangle(SKETCH6_W, SKETCH6_H)
    extrude(amount=-CUT_EXTRUDE2_DEPTH, mode=Mode.SUBTRACT)

    # Sketch6<2> → Cut-Extrude3 (cut)
    with BuildSketch(Plane.ZY.offset(-8.1).offset(CUT_EXTRUDE3_START)):
        with Locations((3.35, 6.2)):
            Rectangle(SKETCH6_2_W, SKETCH6_2_H)
    extrude(amount=CUT_EXTRUDE3_DEPTH, mode=Mode.SUBTRACT)

    # Fillet2
    fillet2_edges = [part_1.edges().sort_by_distance(p)[0] for p in [
        (-15, 2, 0),
        (0, 2, 15),
        (15, 2, 0),
        (0, 0, 15),
        (-15, 0, 0),
        (0, 0, -15),
        (15, 0, 0),
        (15, 1, 15),
        (-15, 1, 15),
        (-15, 1, -15),
        (15, 1, -15),
        (0, 2, -15),
    ]]
    fillet(fillet2_edges, radius=FILLET2_R - 0.0001)  # a hair under: the kernel refuses the full size


solid = part_1.part
